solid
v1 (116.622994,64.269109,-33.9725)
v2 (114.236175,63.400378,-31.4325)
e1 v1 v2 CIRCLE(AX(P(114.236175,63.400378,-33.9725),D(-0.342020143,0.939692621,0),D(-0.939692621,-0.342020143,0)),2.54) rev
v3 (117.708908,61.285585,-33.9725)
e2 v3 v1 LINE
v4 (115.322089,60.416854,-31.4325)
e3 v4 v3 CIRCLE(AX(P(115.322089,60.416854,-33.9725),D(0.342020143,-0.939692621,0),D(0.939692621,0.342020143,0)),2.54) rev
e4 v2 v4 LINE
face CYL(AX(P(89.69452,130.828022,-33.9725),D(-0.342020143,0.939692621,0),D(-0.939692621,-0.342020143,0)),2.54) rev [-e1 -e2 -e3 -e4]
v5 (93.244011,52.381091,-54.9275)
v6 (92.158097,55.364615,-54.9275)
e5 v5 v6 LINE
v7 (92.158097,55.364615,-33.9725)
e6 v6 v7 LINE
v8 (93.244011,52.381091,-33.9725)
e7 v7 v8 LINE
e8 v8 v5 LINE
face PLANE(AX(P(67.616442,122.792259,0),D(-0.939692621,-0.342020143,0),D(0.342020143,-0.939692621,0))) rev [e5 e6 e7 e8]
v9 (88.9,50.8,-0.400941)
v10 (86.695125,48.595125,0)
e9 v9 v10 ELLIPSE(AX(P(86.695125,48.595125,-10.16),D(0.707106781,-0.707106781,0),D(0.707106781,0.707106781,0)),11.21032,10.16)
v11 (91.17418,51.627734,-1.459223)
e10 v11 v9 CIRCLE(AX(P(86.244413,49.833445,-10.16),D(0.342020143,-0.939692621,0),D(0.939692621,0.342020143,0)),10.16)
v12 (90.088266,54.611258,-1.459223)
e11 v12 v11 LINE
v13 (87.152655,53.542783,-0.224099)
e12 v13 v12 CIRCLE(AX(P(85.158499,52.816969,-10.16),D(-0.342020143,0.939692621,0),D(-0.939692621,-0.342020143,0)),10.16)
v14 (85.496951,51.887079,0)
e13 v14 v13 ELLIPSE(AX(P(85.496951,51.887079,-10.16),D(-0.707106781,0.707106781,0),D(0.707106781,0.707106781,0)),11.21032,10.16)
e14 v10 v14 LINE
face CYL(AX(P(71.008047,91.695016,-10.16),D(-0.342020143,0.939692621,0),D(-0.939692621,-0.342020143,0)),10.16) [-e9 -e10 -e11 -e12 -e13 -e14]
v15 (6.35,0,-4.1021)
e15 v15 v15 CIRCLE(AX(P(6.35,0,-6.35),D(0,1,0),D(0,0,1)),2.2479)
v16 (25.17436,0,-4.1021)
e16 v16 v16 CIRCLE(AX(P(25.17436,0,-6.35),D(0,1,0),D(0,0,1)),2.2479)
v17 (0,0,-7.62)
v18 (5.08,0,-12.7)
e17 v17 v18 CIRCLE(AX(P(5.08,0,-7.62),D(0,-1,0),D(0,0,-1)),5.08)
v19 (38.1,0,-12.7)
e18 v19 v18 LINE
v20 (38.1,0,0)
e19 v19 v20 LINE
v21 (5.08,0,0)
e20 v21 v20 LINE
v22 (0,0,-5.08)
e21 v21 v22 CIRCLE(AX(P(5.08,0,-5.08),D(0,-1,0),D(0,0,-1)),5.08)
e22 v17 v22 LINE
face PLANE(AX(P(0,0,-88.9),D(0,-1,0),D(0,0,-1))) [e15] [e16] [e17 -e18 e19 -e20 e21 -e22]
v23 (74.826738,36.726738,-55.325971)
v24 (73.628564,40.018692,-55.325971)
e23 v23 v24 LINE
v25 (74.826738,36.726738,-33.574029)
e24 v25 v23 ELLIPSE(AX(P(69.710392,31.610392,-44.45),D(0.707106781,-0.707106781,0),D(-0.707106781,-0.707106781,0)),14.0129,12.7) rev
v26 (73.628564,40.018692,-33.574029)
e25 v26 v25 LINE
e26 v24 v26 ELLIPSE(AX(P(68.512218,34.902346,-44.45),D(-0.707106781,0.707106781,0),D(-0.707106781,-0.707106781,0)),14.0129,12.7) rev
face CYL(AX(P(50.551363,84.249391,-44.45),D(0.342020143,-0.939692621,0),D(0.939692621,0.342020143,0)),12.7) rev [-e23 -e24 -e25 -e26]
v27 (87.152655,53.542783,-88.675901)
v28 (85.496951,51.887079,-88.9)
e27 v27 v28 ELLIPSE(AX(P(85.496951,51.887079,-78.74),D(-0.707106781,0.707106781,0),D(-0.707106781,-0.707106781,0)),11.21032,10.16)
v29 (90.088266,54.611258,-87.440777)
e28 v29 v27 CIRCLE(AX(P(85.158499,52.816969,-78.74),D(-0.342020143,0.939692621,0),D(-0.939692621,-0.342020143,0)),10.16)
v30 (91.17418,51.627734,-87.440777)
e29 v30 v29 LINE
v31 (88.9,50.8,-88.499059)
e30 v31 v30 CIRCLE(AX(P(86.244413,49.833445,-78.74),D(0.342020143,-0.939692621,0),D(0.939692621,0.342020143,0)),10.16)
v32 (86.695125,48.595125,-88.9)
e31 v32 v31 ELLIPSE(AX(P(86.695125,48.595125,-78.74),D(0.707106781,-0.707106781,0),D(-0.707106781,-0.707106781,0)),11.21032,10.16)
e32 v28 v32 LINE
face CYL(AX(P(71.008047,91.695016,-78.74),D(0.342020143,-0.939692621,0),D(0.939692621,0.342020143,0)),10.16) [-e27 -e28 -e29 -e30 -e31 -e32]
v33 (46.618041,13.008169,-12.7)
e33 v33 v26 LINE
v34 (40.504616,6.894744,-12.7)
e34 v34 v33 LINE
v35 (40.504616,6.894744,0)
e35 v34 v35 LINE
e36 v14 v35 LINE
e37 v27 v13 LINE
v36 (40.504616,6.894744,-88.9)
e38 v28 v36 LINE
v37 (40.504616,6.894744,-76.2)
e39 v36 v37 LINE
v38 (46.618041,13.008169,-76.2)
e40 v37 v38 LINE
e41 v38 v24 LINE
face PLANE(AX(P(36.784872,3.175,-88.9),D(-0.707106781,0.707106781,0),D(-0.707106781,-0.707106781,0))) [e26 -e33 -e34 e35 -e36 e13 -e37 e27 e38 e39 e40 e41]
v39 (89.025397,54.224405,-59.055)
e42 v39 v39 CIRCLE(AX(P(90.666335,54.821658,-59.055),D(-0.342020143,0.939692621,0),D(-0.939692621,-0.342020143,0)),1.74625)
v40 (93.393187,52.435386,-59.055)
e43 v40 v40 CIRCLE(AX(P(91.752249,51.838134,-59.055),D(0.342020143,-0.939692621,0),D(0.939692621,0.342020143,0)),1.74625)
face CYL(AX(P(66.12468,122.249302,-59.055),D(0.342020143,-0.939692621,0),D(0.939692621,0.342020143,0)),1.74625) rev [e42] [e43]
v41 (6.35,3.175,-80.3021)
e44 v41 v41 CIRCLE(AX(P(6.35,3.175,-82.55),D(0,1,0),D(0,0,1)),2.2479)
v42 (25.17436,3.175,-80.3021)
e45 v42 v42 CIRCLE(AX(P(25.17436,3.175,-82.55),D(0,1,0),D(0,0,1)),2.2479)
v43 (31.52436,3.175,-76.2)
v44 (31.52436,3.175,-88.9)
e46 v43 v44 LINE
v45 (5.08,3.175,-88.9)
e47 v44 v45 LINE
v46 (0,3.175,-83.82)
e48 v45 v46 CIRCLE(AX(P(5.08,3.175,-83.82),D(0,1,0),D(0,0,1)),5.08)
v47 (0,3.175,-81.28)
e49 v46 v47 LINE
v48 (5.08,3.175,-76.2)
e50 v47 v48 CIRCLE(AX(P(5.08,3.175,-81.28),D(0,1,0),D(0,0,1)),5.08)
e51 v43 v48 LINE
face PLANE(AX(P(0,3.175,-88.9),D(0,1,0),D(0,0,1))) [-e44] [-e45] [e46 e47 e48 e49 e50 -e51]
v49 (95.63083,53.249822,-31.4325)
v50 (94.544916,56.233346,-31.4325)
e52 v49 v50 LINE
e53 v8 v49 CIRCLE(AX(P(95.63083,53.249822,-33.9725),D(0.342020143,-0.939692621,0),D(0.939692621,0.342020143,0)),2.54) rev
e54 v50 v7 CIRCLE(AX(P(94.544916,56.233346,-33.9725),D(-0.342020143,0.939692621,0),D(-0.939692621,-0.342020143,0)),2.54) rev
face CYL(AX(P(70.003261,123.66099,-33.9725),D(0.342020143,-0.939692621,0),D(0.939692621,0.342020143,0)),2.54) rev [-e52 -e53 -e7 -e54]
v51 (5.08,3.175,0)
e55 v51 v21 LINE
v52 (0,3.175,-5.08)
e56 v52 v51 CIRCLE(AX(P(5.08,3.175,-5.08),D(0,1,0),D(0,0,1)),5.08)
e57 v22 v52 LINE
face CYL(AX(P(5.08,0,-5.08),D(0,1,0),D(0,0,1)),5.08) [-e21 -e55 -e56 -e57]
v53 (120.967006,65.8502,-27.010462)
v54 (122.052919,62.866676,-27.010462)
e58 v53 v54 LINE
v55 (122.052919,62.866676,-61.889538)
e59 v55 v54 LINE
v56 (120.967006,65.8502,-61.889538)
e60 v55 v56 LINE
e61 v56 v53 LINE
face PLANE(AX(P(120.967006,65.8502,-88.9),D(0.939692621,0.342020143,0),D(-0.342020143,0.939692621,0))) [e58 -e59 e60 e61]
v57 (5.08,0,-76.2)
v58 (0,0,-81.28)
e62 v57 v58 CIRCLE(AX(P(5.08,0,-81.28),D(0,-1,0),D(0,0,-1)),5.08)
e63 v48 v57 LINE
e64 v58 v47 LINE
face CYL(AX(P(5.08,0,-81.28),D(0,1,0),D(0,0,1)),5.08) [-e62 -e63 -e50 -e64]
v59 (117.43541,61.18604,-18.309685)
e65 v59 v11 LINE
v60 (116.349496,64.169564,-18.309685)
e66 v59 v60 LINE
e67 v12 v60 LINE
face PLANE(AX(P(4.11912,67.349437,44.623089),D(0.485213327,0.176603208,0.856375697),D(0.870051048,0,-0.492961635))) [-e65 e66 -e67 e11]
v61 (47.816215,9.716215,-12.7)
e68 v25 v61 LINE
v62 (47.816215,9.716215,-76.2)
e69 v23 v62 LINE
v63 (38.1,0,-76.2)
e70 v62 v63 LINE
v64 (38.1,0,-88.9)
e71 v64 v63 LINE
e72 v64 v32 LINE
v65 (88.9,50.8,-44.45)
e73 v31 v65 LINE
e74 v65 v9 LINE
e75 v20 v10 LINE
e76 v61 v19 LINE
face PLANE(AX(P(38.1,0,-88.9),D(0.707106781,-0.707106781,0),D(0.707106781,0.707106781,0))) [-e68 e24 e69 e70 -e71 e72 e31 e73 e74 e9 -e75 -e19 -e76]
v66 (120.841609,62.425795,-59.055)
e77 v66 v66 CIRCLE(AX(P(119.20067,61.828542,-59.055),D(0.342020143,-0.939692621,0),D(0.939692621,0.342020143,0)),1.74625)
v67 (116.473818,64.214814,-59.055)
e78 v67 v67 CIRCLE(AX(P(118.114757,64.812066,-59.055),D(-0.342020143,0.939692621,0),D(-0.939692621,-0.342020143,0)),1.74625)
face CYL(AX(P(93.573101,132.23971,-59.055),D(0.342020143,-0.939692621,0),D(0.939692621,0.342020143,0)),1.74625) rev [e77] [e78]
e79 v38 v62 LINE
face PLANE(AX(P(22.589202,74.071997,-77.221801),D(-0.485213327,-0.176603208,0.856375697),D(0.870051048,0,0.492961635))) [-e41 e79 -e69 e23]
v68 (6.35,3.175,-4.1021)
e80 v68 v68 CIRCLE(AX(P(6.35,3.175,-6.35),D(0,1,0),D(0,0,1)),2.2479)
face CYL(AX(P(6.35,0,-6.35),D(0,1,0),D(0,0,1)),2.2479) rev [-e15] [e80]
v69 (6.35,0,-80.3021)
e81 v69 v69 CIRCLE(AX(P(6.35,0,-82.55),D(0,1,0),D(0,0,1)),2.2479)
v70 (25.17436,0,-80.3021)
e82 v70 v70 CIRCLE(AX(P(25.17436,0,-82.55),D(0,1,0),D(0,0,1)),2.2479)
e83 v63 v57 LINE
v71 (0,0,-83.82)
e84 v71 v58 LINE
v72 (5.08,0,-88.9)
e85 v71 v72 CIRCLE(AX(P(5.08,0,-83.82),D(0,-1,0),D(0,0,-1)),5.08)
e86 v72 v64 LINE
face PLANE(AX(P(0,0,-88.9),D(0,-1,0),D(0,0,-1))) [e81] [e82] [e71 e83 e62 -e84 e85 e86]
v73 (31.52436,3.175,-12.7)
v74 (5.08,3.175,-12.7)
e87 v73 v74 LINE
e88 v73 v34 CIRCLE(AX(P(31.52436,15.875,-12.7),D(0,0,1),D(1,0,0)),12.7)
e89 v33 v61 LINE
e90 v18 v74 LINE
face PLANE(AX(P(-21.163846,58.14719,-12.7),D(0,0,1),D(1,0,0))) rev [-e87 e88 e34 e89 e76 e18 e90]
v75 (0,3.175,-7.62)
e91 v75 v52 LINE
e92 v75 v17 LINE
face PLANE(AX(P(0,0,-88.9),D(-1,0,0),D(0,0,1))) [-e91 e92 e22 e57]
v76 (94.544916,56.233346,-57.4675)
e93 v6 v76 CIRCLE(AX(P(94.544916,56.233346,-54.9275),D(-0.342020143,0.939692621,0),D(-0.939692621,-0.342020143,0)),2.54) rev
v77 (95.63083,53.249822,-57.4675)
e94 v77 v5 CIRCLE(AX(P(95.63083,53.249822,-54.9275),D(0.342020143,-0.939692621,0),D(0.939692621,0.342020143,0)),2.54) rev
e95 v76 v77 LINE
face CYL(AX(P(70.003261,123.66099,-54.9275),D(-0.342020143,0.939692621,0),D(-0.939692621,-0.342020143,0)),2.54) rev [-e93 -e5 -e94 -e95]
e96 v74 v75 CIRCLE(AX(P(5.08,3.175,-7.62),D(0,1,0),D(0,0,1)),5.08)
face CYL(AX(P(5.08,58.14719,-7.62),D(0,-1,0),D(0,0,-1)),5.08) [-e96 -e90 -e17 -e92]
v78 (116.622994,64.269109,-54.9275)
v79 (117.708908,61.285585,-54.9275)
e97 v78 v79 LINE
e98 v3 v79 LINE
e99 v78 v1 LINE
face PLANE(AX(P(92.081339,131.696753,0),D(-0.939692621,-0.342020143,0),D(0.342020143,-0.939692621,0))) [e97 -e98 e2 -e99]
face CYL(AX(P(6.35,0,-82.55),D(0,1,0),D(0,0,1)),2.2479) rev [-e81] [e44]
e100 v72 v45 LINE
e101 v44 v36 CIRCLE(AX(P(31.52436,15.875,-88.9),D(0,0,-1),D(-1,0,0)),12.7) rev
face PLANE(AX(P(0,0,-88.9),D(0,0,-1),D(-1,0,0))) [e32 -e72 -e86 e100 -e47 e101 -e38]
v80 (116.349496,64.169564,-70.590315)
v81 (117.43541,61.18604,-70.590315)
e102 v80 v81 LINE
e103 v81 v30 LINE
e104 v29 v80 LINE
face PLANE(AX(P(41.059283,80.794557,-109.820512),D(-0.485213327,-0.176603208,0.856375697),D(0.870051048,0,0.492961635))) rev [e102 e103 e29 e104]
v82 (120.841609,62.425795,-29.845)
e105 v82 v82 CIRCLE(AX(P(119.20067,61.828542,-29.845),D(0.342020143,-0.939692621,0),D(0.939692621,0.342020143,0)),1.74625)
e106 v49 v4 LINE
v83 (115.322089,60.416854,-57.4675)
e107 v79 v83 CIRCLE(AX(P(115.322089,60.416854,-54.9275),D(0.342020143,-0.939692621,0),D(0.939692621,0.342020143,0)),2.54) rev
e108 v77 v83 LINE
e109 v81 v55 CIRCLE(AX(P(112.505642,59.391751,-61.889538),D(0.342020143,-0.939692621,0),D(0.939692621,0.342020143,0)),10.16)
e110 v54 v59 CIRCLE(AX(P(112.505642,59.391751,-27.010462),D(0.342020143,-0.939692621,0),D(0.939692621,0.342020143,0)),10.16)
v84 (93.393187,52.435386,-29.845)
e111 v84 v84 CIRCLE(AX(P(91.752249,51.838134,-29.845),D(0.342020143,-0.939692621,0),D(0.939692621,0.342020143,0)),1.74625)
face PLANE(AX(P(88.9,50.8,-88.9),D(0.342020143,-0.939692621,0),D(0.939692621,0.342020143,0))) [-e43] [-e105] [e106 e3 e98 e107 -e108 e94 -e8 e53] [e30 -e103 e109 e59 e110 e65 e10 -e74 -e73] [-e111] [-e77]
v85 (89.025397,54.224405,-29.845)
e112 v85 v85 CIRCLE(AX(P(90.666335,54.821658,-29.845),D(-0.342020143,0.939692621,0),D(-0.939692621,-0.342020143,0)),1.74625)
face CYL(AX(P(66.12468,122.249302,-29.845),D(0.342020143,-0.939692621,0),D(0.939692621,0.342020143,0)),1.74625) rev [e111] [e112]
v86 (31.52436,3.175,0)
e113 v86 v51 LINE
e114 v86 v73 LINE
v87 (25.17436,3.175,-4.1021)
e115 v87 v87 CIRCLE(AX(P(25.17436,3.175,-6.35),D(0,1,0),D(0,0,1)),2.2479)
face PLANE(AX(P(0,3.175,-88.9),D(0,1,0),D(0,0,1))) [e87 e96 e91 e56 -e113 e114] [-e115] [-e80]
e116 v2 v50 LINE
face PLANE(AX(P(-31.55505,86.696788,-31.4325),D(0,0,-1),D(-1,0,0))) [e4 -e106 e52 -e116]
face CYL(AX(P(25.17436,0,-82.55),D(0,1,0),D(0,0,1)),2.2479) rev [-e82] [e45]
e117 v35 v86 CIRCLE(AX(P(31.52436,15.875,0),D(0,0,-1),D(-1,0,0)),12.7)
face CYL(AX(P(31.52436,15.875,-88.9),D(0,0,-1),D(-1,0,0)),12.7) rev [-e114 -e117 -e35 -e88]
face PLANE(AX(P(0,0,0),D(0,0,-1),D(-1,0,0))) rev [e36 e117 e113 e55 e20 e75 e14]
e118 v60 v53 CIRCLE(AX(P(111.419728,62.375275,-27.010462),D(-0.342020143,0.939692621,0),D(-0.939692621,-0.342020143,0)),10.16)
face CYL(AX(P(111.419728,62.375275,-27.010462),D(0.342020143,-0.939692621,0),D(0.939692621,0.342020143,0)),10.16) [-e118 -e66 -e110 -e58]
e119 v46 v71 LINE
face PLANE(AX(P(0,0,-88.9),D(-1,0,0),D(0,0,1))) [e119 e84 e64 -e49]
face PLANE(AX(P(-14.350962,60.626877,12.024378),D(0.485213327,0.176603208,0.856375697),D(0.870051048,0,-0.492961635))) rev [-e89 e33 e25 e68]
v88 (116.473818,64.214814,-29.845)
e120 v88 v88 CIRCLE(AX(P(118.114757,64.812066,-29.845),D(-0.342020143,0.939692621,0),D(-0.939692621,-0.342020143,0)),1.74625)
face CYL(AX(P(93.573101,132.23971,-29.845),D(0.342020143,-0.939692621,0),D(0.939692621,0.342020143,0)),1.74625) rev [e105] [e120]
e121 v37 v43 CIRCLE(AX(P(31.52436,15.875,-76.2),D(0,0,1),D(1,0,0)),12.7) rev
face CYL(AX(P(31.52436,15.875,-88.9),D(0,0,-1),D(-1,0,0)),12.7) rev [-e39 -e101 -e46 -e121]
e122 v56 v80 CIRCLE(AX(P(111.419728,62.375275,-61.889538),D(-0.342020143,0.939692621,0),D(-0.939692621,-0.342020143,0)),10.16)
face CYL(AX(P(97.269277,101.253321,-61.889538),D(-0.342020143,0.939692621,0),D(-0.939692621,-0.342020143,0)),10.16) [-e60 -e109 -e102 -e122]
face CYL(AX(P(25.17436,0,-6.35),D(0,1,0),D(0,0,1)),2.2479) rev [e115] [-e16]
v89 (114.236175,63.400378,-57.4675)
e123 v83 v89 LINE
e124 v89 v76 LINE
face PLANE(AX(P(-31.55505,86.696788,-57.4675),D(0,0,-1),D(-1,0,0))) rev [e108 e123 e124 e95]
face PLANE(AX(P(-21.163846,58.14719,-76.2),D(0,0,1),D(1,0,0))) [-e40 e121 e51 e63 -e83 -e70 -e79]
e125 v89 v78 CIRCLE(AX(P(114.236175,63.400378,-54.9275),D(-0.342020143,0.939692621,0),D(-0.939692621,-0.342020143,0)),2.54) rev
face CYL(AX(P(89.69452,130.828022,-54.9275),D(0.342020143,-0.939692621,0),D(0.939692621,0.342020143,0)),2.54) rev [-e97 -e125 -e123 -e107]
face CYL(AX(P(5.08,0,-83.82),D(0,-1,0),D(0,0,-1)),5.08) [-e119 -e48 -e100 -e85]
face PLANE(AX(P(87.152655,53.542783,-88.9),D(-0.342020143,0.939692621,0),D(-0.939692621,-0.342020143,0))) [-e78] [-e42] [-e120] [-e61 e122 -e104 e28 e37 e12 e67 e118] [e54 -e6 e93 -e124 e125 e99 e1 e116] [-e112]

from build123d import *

# Parameters (mm, degrees)
BOSS_EXTRUDE1_DEPTH     = 88.9
SKETCH3_W               = 26.035
SKETCH3_H               = 26.035
CUT_EXTRUDE2_DEPTH      = 74.93
FILLET1_R               = 2.54
CUT_EXTRUDE3_DEPTH      = 164.520153114
CUT_EXTRUDE3_DEPTH_BACK = 164.520153114
FILLET2_R               = 12.7
FILLET3_R               = 12.7
FILLET4_R               = 10.16
CUT_EXTRUDE4_DEPTH      = 164.487937905
CUT_EXTRUDE4_DEPTH_BACK = 164.487937905
SKETCH5_W               = 1.155605494
SKETCH5_H               = 63.5
FILLET5_R               = 5.08
CUT_EXTRUDE5_DEPTH      = 164.487937905
CUT_EXTRUDE5_DEPTH_BACK = 164.487937905
SKETCH6_R               = 2.2479


with BuildPart() as part:
    # Sketch1 → Boss-Extrude1 (new body)
    with BuildSketch(Plane.XY):
        Polygon((0, 0), (38.1, 0), (88.9, 50.8), (122.052919477, 62.866675869), (120.967005522, 65.85019994), (87.152654683, 53.542782743), (36.784871939, 3.175), (0, 3.175), align=None)
    extrude(amount=-BOSS_EXTRUDE1_DEPTH)

    # Sketch3 → Cut-Extrude2 (cut)
    with BuildSketch(Plane(origin=(-5.927480783, 16.285619605, 0), x_dir=(0.9396926207859088, 0.3420201433256679, 0), z_dir=(0.3420201433256679, -0.9396926207859088, 0))):
        with BuildLine():
            Line((103.948597269, -31.59125), (103.948597269, -29.845))
            Line((103.948597269, -29.845), (105.694847269, -29.845))
            ThreePointArc((105.694847269, -29.845), (102.713812052, -28.610214783), (103.948597269, -31.59125))
        make_face()
        with BuildLine():
            Line((105.694847269, -29.845), (103.948597269, -29.845))
            Line((103.948597269, -29.845), (103.948597269, -31.59125))
            ThreePointArc((103.948597269, -31.59125), (105.183382485, -31.079785217), (105.694847269, -29.845))
        make_face()
        with Locations((118.553597269, -44.45)):
            Rectangle(SKETCH3_W, SKETCH3_H)
        with BuildLine():
            ThreePointArc((134.904847269, -29.845), (133.158597269, -28.09875), (131.412347269, -29.845))
            Line((131.412347269, -29.845), (133.158597269, -29.845))
            Line((133.158597269, -29.845), (133.158597269, -31.59125))
            ThreePointArc((133.158597269, -31.59125), (134.393382485, -31.079785217), (134.904847269, -29.845))
        make_face()
        with BuildLine():
            Line((133.158597269, -29.845), (131.412347269, -29.845))
            ThreePointArc((131.412347269, -29.845), (131.923812052, -31.079785217), (133.158597269, -31.59125))
            Line((133.158597269, -31.59125), (133.158597269, -29.845))
        make_face()
        with BuildLine():
            ThreePointArc((134.904847269, -59.055), (134.393382485, -57.820214783), (133.158597269, -57.30875))
            Line((133.158597269, -57.30875), (133.158597269, -59.055))
            Line((133.158597269, -59.055), (131.412347269, -59.055))
            ThreePointArc((131.412347269, -59.055), (133.158597269, -60.80125), (134.904847269, -59.055))
        make_face()
        with BuildLine():
            Line((133.158597269, -59.055), (133.158597269, -57.30875))
            ThreePointArc((133.158597269, -57.30875), (131.923812052, -57.820214783), (131.412347269, -59.055))
            Line((131.412347269, -59.055), (133.158597269, -59.055))
        make_face()
        with BuildLine():
            ThreePointArc((105.694847269, -59.055), (105.183382485, -57.820214783), (103.948597269, -57.30875))
            Line((103.948597269, -57.30875), (103.948597269, -59.055))
            Line((103.948597269, -59.055), (105.694847269, -59.055))
        make_face()
        with BuildLine():
            Line((103.948597269, -59.055), (103.948597269, -57.30875))
            ThreePointArc((103.948597269, -57.30875), (102.713812052, -60.289785217), (105.694847269, -59.055))
            Line((105.694847269, -59.055), (103.948597269, -59.055))
        make_face()
    extrude(amount=-CUT_EXTRUDE2_DEPTH, mode=Mode.SUBTRACT)

    # Fillet1
    fillet1_edges = [part.edges().sort_by_distance(p)[0] for p in [
        (92.70105407, 53.872852754, -31.4325),
        (117.165951452, 62.777347186, -31.4325),
        (117.165951452, 62.777347186, -57.4675),
        (92.70105407, 53.872852754, -57.4675),
    ]]
    fillet(fillet1_edges, radius=FILLET1_R)

    # Sketch4 → Cut-Extrude3 (cut, two sides: drawn at the far end of the back side and taken through both)
    with BuildSketch(Plane(origin=(-5.927480783, 16.285619605, 0), x_dir=(0.9396926207859088, 0.3420201433256679, 0), z_dir=(0.3420201433256679, -0.9396926207859088, 0)).offset(-CUT_EXTRUDE3_DEPTH_BACK)):
        Polygon((136.193897269, -67.6275), (100.913297269, -88.9), (136.193897269, -88.9), align=None)
        Polygon((48.255685329, -12.7), (35.652386673, -12.7), (35.652386673, -76.2), (48.255685329, -76.2), (100.913297269, -44.45), align=None)
        Polygon((121.976342045, -12.7), (136.193897269, -21.2725), (136.193897269, -12.7), align=None)
        Polygon((100.913297269, 0), (121.976342045, -12.7), (136.193897269, -12.7), (136.193897269, 0), align=None)
    extrude(amount=CUT_EXTRUDE3_DEPTH + CUT_EXTRUDE3_DEPTH_BACK, mode=Mode.SUBTRACT)

    # Fillet2
    # the kernel refuses this fillet: 12.7 mm, written as the material it adds along each edge
    with BuildSketch(Plane(origin=(106.909963983, 1.318030631, -44.45), x_dir=(-0.8047299231694688, -0.2928977386570137, -0.5163532370822017), z_dir=(-0.3420201433256679, 0.9396926207859088, 0))) as fillet2_piece_1_section:
        with BuildLine():
            CenterArc((FILLET2_R * 1.65850746269, FILLET2_R), FILLET2_R, 152.175900406, 117.824099594)
            Line((FILLET2_R * 0.774122735992, FILLET2_R * 1.46675866911), (0, 0))
            Line((0, 0), (FILLET2_R * 1.65850746269, 0))
        make_face()
    fillet2_piece_1 = extrude(amount=55.83261194, mode=Mode.PRIVATE)
    fillet2_piece_1 = split(fillet2_piece_1, bisect_by=Plane(origin=(82.567963605, 44.467963605, -44.45), z_dir=(-0.7071067811865475, 0.7071067811865476, 0)), keep=Keep.TOP, mode=Mode.PRIVATE)
    fillet2_piece_1 = split(fillet2_piece_1, bisect_by=Plane(origin=(80.322899575, 46.713027635, -44.45), z_dir=(0.7071067811865475, -0.7071067811865476, 0)), keep=Keep.TOP, mode=Mode.PRIVATE)
    add(fillet2_piece_1)

    # Fillet3
    fillet3_edges = [part.edges().sort_by_distance(p)[0] for p in [
        (36.784871939, 3.175, -6.35),
        (36.784871939, 3.175, -82.55),
    ]]
    fillet(fillet3_edges, radius=FILLET3_R)

    # Fillet4
    fillet4_edges = [part.edges().sort_by_distance(p)[0] for p in [
        (88.357043022, 52.291762035, -88.9),
        (121.509962499, 64.358437904, -67.6275),
        (121.509962499, 64.358437904, -21.2725),
        (88.357043022, 52.291762035, 0),
    ]]
    fillet(fillet4_edges, radius=FILLET4_R)

    # Sketch5 → Cut-Extrude4 (cut, two sides: drawn at the far end of the back side and taken through both)
    with BuildSketch(Plane(origin=(0, 3.175, 0), x_dir=(1, 0, 0), z_dir=(0, 1, 0)).offset(-CUT_EXTRUDE4_DEPTH_BACK)):
        Polygon((36.784871939, 12.7), (36.784871939, 76.2), (31.524359697, 76.2), (0, 76.2), (0, 12.7), (31.524359697, 12.7), align=None)
        with Locations((37.362674686, 44.45)):
            Rectangle(SKETCH5_W, SKETCH5_H)
    extrude(amount=CUT_EXTRUDE4_DEPTH + CUT_EXTRUDE4_DEPTH_BACK, mode=Mode.SUBTRACT)

    # Fillet5
    fillet5_edges = [part.edges().sort_by_distance(p)[0] for p in [
        (0, 1.5875, 0),
        (0, 1.5875, -12.7),
        (0, 1.5875, -76.2),
        (0, 1.5875, -88.9),
    ]]
    fillet(fillet5_edges, radius=FILLET5_R)

    # Sketch6 → Cut-Extrude5 (cut, two sides: drawn at the far end of the back side and taken through both)
    with BuildSketch(Plane(origin=(0, 3.175, 0), x_dir=(1, 0, 0), z_dir=(0, 1, 0)).offset(-CUT_EXTRUDE5_DEPTH_BACK)):
        with Locations(Location((6.35, 82.55, 0), (0, 0, 270))):
            Circle(SKETCH6_R)
        with Locations(Location((25.174359697, 82.55, 0), (0, 0, 270))):
            Circle(SKETCH6_R)
        with Locations(Location((6.35, 6.35, 0), (0, 0, 270))):
            Circle(SKETCH6_R)
        with Locations(Location((25.174359697, 6.35, 0), (0, 0, 270))):
            Circle(SKETCH6_R)
    extrude(amount=CUT_EXTRUDE5_DEPTH + CUT_EXTRUDE5_DEPTH_BACK, mode=Mode.SUBTRACT)


solid = part.part
